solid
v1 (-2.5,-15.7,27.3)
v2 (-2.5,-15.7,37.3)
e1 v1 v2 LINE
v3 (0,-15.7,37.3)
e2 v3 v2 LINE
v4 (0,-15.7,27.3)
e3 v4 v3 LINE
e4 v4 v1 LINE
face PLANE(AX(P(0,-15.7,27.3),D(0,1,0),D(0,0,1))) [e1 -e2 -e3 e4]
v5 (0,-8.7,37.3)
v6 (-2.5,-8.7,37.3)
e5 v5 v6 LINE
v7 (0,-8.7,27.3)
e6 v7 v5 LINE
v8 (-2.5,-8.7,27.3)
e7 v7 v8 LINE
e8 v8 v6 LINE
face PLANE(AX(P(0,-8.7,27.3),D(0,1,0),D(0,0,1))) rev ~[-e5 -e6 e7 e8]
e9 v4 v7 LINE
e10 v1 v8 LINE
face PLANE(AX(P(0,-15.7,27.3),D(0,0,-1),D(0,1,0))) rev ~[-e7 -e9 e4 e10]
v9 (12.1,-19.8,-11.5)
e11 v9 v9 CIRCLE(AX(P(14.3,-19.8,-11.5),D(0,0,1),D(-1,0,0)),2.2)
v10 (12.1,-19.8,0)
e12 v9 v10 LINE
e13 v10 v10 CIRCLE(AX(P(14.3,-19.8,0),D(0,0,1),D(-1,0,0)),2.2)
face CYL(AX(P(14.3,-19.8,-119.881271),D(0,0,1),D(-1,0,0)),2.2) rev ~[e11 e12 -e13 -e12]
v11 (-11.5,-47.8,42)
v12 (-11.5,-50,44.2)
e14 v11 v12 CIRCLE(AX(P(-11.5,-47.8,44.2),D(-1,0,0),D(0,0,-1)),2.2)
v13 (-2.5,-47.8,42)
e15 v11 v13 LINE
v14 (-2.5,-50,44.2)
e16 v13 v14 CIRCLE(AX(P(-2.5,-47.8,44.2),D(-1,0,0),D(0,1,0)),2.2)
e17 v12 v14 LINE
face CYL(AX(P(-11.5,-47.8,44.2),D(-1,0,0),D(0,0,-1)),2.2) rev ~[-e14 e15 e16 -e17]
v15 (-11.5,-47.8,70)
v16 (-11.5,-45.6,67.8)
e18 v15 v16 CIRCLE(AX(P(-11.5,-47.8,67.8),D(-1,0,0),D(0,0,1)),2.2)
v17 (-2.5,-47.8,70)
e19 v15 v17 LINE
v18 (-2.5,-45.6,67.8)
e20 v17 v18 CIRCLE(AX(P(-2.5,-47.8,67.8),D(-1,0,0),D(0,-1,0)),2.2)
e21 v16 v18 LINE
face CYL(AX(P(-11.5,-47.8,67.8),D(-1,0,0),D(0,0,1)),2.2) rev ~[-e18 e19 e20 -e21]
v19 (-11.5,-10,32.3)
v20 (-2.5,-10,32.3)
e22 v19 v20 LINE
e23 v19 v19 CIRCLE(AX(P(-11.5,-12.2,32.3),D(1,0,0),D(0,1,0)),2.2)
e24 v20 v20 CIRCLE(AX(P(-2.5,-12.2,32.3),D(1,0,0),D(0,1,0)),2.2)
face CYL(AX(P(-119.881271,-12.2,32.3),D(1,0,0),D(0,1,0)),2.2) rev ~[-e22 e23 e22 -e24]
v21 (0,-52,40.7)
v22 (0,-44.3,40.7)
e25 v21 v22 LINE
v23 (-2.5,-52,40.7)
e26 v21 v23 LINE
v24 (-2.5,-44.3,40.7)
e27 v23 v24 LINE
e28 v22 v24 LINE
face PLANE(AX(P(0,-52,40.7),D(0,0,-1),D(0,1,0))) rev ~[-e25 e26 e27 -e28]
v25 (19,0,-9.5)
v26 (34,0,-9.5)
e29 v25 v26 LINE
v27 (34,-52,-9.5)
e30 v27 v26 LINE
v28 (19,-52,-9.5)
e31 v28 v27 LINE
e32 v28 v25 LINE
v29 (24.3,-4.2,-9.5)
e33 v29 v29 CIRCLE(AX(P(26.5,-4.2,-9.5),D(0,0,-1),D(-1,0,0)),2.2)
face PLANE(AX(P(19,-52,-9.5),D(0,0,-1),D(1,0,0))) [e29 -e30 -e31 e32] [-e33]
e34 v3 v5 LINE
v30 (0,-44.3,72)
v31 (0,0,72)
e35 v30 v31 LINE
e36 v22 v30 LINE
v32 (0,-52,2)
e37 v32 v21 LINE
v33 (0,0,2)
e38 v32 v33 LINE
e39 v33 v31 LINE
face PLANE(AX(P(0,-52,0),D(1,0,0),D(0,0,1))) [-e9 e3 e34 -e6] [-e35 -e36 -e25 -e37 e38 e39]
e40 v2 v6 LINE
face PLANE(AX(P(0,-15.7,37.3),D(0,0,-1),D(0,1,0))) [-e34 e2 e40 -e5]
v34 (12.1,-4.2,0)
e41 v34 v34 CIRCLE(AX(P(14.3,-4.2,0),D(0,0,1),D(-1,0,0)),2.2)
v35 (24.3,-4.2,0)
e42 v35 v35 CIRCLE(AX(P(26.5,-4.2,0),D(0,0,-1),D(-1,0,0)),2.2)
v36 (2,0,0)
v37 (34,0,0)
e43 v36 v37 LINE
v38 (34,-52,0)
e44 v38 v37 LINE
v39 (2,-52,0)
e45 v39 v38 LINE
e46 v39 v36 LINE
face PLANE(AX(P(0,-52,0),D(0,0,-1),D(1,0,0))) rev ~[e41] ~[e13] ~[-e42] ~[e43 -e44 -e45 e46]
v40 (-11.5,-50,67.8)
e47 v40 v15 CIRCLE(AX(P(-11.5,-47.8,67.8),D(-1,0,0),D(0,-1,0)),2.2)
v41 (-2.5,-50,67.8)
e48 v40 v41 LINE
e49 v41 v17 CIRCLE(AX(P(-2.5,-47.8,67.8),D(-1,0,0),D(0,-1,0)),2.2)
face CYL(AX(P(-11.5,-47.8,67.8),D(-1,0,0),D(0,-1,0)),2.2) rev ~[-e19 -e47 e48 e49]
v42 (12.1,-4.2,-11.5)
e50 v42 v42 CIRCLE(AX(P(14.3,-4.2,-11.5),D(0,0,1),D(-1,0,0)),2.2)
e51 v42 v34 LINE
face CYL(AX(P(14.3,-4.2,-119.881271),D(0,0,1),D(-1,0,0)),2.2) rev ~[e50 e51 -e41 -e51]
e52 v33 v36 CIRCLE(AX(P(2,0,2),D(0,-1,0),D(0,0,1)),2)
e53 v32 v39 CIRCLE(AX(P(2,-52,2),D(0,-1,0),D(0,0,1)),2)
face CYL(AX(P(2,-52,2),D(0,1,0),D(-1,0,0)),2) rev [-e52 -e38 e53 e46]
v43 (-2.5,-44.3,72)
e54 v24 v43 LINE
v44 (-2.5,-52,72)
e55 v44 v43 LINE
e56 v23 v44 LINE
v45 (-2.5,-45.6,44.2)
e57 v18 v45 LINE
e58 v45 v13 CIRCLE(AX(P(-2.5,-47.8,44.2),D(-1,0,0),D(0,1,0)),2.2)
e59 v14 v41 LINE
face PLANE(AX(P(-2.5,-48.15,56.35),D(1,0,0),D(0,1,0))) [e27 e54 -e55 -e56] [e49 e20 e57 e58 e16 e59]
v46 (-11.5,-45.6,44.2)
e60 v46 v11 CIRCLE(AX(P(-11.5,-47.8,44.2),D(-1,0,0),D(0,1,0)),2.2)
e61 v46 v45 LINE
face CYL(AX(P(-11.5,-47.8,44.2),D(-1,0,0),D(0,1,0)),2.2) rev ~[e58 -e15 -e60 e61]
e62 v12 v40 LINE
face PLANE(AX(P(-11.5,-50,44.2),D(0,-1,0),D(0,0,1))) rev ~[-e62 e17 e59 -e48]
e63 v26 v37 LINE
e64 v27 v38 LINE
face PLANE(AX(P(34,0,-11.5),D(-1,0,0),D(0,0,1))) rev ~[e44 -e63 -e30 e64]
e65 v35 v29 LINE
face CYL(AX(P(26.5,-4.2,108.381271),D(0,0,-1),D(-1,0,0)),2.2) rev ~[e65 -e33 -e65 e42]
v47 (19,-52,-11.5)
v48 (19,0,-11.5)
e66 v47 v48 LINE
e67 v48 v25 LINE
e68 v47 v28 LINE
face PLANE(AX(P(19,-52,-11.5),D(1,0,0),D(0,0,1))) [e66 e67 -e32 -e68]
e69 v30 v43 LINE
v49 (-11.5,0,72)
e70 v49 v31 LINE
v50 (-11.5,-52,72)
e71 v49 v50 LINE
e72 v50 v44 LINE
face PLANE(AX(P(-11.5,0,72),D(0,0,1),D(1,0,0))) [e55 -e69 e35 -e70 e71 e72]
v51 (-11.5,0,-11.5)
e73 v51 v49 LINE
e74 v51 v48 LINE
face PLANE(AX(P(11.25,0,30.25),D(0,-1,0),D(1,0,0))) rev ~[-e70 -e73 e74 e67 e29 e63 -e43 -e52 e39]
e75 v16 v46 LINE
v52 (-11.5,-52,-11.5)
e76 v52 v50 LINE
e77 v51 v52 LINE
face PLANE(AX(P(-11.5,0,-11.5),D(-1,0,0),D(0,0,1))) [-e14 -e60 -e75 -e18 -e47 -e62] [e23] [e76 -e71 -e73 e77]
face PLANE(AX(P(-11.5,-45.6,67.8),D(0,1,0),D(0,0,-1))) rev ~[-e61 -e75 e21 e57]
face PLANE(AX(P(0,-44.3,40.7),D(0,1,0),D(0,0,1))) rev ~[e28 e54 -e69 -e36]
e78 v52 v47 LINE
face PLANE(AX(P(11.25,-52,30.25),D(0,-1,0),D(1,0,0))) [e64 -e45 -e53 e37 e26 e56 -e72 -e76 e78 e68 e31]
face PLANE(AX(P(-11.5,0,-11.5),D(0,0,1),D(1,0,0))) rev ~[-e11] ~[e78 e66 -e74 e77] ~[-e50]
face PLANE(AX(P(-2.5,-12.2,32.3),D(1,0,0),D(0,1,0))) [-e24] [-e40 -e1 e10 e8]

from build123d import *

# Parameters (mm, degrees)
F0_W        = 45.5
F0_H        = 83.5
F1_DEPTH    = 52
F2_W        = 34
F2_H        = 72
F3_DEPTH    = 52.001
F5_W        = 15
F5_H        = 2
F6_DEPTH    = 52.001
F8_R        = 2
F10_D       = 4.4
F10_ON_F9_D = 4.4
F10_ON_F4_D = 4.4
F12_DEPTH   = 45.501
F13_W       = 7
F13_H       = 10
F14_DEPTH   = 2.5
F15_W       = 7.7
F15_H       = 31.3
F16_DEPTH   = 2.5


# Not quite as in the source:
# - a feature names something its author has since deleted; it is built from what else it names


with BuildPart() as f1:
    # F0 (on Front) → F1 (new body)
    with BuildSketch(Plane.XZ):
        with Locations((11.25, 30.25)):
            Rectangle(F0_W, F0_H)
    extrude(amount=F1_DEPTH)

    # F2 (on face) → F3 (cut, through all)
    with BuildSketch(Plane.XZ.offset(52)):
        with Locations((17, 36)):
            Rectangle(F2_W, F2_H)
    extrude(amount=-F3_DEPTH, mode=Mode.SUBTRACT)

    # F5 (on face) → F6 (cut, through all)
    with BuildSketch(Plane.XZ.offset(52)):
        with Locations((26.5, -10.5)):
            Rectangle(F5_W, F5_H)
    extrude(amount=-F6_DEPTH, mode=Mode.SUBTRACT)

    # F8
    f8_edges = [f1.edges().sort_by_distance(p)[0] for p in [
        (0, -26, 0),
    ]]
    fillet(f8_edges, radius=F8_R)

    # F10 (through all)
    with Locations(Plane.XY):
        with Locations((26.5, -4.2)):
            Hole(F10_D / 2)

    # F10 on F9 (through all)
    with Locations(Plane(origin=(-11.5, 0, 0), x_dir=(0, -1, 0), z_dir=(-1, 0, 0))):
        with Locations((12.2, 32.3)):
            Hole(F10_ON_F9_D / 2)

    # F10 on F4 (through all)
    with Locations(Plane(origin=(0, 0, -11.5), x_dir=(1, 0, 0), z_dir=(0, 0, -1))):
        with Locations((14.3, 19.8), (14.3, 4.2)):
            Hole(F10_ON_F4_D / 2)

    # F11 (on face) → F12 (cut, through all)
    with BuildSketch(Plane(origin=(-11.5, 0, 0), x_dir=(0, -1, 0), z_dir=(-1, 0, 0))):
        with BuildLine():
            ThreePointArc((47.8, 70), (46.2443650814, 69.3556349186), (45.6, 67.8))
            Line((45.6, 67.8), (45.6, 44.2))
            ThreePointArc((45.6, 44.2), (46.2443650814, 42.6443650814), (47.8, 42))
            ThreePointArc((47.8, 42), (49.3556349186, 42.6443650814), (50, 44.2))
            Line((50, 44.2), (50, 67.8))
            ThreePointArc((50, 67.8), (49.3556349186, 69.3556349186), (47.8, 70))
        make_face()
    extrude(amount=-F12_DEPTH, mode=Mode.SUBTRACT)

    # F13 (on face) → F14 (cut)
    with BuildSketch(Plane.YZ):
        with Locations((-12.2, 32.3)):
            Rectangle(F13_W, F13_H)
    extrude(amount=-F14_DEPTH, mode=Mode.SUBTRACT)

    # F15 (on face) → F16 (cut)
    with BuildSketch(Plane.YZ):
        with Locations((-48.15, 56.35)):
            Rectangle(F15_W, F15_H)
        with BuildLine():
            Line((-50, 44.2), (-50, 67.8))
            ThreePointArc((-50, 67.8), (-47.8, 70), (-45.6, 67.8))
            Line((-45.6, 67.8), (-45.6, 44.2))
            ThreePointArc((-45.6, 44.2), (-47.8, 42), (-50, 44.2))
        make_face(mode=Mode.SUBTRACT)
    extrude(amount=-F16_DEPTH, mode=Mode.SUBTRACT)


solid = f1.part
